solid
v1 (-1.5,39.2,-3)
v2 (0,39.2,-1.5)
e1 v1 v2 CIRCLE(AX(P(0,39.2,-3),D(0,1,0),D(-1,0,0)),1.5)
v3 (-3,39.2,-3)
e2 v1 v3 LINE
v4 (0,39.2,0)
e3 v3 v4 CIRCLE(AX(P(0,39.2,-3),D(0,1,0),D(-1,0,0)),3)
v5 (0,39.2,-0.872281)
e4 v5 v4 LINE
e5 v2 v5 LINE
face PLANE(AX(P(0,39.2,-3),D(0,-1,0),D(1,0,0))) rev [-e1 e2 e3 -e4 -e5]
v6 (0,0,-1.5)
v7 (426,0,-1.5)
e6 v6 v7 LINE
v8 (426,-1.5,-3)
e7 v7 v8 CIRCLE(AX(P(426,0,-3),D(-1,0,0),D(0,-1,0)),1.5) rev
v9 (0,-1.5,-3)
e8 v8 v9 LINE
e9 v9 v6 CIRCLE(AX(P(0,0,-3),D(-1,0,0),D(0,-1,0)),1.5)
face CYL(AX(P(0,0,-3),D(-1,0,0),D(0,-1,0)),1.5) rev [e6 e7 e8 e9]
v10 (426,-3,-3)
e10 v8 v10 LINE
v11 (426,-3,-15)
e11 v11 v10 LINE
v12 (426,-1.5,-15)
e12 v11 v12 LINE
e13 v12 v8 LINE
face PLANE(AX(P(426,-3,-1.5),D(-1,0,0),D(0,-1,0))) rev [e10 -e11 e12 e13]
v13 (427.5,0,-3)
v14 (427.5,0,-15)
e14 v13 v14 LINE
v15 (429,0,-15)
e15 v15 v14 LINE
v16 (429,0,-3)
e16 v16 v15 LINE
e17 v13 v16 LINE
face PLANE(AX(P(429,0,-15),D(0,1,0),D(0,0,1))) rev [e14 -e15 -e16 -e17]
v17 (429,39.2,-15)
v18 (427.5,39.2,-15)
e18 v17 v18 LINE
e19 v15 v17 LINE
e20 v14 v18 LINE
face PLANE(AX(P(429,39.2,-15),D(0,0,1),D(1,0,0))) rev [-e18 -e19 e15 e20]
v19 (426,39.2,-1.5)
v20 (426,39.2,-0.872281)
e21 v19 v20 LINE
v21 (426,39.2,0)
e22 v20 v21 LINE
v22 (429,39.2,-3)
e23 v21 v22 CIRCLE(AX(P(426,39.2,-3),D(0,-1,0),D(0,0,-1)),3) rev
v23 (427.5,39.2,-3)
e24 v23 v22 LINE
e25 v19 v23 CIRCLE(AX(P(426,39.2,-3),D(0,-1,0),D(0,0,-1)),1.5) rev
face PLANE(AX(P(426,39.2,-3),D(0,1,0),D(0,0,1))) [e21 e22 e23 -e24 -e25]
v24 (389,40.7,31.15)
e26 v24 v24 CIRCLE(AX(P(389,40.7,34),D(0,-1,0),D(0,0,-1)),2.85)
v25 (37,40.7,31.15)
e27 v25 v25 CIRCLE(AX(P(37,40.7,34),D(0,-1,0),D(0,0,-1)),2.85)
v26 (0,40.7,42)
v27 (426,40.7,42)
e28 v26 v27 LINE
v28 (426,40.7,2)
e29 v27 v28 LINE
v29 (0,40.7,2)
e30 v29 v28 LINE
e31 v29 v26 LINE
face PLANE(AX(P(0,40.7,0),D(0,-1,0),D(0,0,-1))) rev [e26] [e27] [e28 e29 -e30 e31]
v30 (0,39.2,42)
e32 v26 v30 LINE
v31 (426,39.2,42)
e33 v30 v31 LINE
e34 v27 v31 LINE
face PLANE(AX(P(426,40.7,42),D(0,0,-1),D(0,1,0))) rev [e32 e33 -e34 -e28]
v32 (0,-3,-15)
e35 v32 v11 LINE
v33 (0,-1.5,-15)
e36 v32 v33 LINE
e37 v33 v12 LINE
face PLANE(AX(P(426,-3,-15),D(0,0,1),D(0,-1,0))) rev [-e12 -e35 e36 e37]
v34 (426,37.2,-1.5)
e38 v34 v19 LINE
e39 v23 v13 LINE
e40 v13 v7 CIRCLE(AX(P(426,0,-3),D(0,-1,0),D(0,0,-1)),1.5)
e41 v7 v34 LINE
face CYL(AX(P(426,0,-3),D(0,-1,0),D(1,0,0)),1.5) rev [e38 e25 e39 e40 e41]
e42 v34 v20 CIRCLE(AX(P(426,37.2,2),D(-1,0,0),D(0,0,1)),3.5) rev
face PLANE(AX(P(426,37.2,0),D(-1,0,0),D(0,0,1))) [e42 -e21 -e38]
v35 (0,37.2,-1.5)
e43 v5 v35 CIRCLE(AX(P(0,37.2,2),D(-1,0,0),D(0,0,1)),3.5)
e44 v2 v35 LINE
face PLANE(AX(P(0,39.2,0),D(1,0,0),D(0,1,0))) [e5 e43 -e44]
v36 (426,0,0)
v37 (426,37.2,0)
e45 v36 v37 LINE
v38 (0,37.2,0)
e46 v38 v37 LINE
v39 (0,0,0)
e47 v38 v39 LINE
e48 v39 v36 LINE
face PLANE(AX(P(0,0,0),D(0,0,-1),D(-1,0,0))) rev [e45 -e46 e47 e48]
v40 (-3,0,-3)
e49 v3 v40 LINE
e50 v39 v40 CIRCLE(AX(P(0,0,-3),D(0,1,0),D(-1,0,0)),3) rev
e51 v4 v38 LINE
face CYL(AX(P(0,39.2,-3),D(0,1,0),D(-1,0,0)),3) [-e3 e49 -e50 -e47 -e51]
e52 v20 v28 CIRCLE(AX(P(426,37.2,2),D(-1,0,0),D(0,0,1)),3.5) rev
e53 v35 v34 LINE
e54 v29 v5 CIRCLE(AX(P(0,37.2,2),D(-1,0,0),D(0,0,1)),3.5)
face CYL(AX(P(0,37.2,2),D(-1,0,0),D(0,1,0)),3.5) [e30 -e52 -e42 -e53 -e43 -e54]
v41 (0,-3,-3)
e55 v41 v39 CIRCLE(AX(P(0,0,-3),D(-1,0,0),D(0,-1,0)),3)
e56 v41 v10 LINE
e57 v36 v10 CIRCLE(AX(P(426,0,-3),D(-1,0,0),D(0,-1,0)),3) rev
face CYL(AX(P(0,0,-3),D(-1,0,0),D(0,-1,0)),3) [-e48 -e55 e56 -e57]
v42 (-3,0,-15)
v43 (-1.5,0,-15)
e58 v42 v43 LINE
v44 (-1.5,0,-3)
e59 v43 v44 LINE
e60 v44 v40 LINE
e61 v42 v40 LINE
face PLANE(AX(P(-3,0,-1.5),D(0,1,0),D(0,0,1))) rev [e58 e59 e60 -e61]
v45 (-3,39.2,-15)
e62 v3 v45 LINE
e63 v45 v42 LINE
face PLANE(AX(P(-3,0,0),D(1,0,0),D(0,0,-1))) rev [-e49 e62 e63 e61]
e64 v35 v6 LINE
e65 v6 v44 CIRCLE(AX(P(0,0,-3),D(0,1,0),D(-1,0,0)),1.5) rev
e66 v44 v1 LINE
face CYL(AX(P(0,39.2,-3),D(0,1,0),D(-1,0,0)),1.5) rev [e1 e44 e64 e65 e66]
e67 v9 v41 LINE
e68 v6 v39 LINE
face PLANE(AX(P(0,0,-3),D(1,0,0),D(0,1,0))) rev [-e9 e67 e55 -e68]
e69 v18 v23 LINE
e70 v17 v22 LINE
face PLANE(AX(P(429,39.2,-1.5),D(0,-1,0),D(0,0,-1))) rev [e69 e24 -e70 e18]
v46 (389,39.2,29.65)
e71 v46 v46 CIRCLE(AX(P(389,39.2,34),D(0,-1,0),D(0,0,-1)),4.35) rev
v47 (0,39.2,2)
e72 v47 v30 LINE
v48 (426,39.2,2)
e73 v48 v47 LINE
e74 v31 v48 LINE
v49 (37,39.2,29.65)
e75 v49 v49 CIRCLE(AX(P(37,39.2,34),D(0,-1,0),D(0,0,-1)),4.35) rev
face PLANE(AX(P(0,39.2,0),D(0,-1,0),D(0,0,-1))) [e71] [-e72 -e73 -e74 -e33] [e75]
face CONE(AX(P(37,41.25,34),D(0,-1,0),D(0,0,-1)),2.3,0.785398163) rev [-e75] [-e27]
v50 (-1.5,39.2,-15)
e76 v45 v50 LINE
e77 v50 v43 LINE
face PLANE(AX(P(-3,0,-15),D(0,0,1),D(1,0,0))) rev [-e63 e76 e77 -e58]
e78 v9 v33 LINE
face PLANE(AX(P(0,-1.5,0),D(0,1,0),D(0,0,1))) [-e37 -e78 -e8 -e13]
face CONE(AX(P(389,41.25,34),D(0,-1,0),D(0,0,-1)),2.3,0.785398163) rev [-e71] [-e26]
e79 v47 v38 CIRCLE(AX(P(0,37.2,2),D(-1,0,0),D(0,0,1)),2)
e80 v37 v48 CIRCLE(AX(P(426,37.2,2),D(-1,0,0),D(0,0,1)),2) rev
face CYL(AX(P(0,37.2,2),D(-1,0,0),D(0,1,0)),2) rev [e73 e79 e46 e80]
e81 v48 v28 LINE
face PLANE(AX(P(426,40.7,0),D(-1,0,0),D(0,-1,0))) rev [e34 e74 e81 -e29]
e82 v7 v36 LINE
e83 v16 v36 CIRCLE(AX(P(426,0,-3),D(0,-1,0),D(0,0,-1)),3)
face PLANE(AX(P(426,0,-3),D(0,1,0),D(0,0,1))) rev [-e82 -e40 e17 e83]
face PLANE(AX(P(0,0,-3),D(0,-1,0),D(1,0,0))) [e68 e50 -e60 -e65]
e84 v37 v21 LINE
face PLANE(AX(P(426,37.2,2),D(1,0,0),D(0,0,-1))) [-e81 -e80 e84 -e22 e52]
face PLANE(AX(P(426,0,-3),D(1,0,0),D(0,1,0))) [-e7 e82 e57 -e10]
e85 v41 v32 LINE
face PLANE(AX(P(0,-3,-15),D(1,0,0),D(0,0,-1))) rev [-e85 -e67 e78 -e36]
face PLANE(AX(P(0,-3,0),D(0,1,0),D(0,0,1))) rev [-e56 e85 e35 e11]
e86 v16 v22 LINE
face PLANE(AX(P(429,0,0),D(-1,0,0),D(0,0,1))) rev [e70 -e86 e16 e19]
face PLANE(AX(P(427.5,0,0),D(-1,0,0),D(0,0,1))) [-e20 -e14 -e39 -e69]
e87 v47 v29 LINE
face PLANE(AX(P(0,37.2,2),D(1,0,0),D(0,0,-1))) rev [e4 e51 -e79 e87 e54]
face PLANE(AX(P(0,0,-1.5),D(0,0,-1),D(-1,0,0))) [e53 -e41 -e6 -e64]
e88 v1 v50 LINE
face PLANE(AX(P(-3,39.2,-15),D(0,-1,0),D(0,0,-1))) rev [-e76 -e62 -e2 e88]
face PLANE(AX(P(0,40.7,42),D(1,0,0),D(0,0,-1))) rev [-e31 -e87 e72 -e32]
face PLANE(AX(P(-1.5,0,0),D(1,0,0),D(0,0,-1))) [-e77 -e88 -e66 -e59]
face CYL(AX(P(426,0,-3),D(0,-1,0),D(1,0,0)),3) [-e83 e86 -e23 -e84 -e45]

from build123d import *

# Parameters (mm, degrees)
SKETCH_1_W                       = 426
SKETCH_1_H                       = 39.2
SM_BASE_FLANGE_1_DEPTH           = 1.5
SM_EDGE_FLANGE_2_DEPTH           = 39.2
SM_EDGE_FLANGE_3_DEPTH           = 426
SM_EDGE_FLANGE_4_DEPTH           = 39.2
SM_EDGE_FLANGE_5_STRIP_W         = 10
SM_EDGE_FLANGE_5_STRIP_H         = 1.5
SM_EDGE_FLANGE_5_STRIP_CUT_DEPTH = 426
SM_EDGE_FLANGE_5_DEPTH           = 426
SKETCH_28_R                      = 2.3
CUT_EXTRUDE_1_DEPTH              = 434.111810044
CHAMFER_1_SIZE                   = 2.05


# Sheet-metal steps are written as plain solids
with BuildPart() as part:
    # Sketch 1 → Базовая кромка1 (new body)
    with BuildSketch(Plane.XY):
        with Locations((213, 19.6)):
            Rectangle(SKETCH_1_W, SKETCH_1_H)
    extrude(amount=-SM_BASE_FLANGE_1_DEPTH)

    # Ребро-кромка2 section (across the edge) → Ребро-кромка2 (add)
    with BuildSketch(Plane(origin=(-1.5, 0, -1.5), x_dir=(1, 0, 0), z_dir=(0, 1, 0))):
        with BuildLine():
            Line((-1.5, 1.5), (-1.5, 13.5))
            Line((-1.5, 13.5), (0, 13.5))
            Line((0, 13.5), (0, 1.5))
            ThreePointArc((0, 1.5), (0.439339828, 0.439339828), (1.5, 0))
            Line((1.5, 0), (1.5, -1.5))
            ThreePointArc((1.5, -1.5), (-0.621320344, -0.621320344), (-1.5, 1.5))
        make_face()
    extrude(amount=SM_EDGE_FLANGE_2_DEPTH)

    # Ребро-кромка3 section (across the edge) → Ребро-кромка3 (add)
    with BuildSketch(Plane(origin=(426, -1.5, -1.5), x_dir=(0, 1, 0), z_dir=(-1, 0, 0))):
        with BuildLine():
            Line((-1.5, 1.5), (-1.5, 13.5))
            Line((-1.5, 13.5), (0, 13.5))
            Line((0, 13.5), (0, 1.5))
            ThreePointArc((0, 1.5), (0.439339828, 0.439339828), (1.5, 0))
            Line((1.5, 0), (1.5, -1.5))
            ThreePointArc((1.5, -1.5), (-0.621320344, -0.621320344), (-1.5, 1.5))
        make_face()
    extrude(amount=SM_EDGE_FLANGE_3_DEPTH)

    # Ребро-кромка4 section (across the edge) → Ребро-кромка4 (add)
    with BuildSketch(Plane(origin=(427.5, 39.2, -1.5), x_dir=(-1, 0, 0), z_dir=(0, -1, 0))):
        with BuildLine():
            Line((-1.5, 1.5), (-1.5, 13.5))
            Line((-1.5, 13.5), (0, 13.5))
            Line((0, 13.5), (0, 1.5))
            ThreePointArc((0, 1.5), (0.439339828, 0.439339828), (1.5, 0))
            Line((1.5, 0), (1.5, -1.5))
            ThreePointArc((1.5, -1.5), (-0.621320344, -0.621320344), (-1.5, 1.5))
        make_face()
    extrude(amount=SM_EDGE_FLANGE_4_DEPTH)

    # Ребро-кромка5 strip (across the edge) → Ребро-кромка5 strip cut (cut)
    with BuildSketch(Plane(origin=(426, 39.2, 0), x_dir=(0, -1, 0), z_dir=(-1, 0, 0))):
        with Locations((-3, -0.75)):
            Rectangle(SM_EDGE_FLANGE_5_STRIP_W, SM_EDGE_FLANGE_5_STRIP_H)
    extrude(amount=SM_EDGE_FLANGE_5_STRIP_CUT_DEPTH, mode=Mode.SUBTRACT)

    # Ребро-кромка5 section (across the edge) → Ребро-кромка5 (add)
    with BuildSketch(Plane(origin=(426, 39.2, 0), x_dir=(0, -1, 0), z_dir=(-1, 0, 0))):
        with BuildLine():
            Line((-1.5, 2), (-1.5, 42))
            Line((-1.5, 42), (0, 42))
            Line((0, 42), (0, 2))
            ThreePointArc((0, 2), (0.585786438, 0.585786438), (2, 0))
            Line((2, 0), (2, -1.5))
            ThreePointArc((2, -1.5), (-0.474873734, -0.474873734), (-1.5, 2))
        make_face()
    extrude(amount=SM_EDGE_FLANGE_5_DEPTH)

    # Эскиз28 → Вырез-Вытянуть1 (cut, through all)
    with BuildSketch(Plane.XZ.offset(-39.2)):
        with Locations(Location((37, 34, 0), (0, 0, 270))):
            Circle(SKETCH_28_R)
        with Locations(Location((389, 34, 0), (0, 0, 270))):
            Circle(SKETCH_28_R)
    extrude(amount=-CUT_EXTRUDE_1_DEPTH, mode=Mode.SUBTRACT)

    # Фаска1
    # the kernel refuses this chamfer: 2.05 mm, written as the material it takes off along each edge
    with BuildSketch(Plane(origin=(389, 39.2, 34), x_dir=(0, 0, -1), z_dir=(-1, 0, 0))) as chamfer_1_piece_1:
        Polygon((2.3 + CHAMFER_1_SIZE, 0), (2.3, -CHAMFER_1_SIZE), (2.3, 0), align=None)
    revolve(axis=Axis((389, 39.2, 34), (0, -1, 0)), mode=Mode.SUBTRACT)
    with BuildSketch(Plane(origin=(37, 39.2, 34), x_dir=(0, 0, -1), z_dir=(-1, 0, 0))) as chamfer_1_piece_2:
        Polygon((2.3 + CHAMFER_1_SIZE, 0), (2.3, -CHAMFER_1_SIZE), (2.3, 0), align=None)
    revolve(axis=Axis((37, 39.2, 34), (0, -1, 0)), mode=Mode.SUBTRACT)


solid = part.part
